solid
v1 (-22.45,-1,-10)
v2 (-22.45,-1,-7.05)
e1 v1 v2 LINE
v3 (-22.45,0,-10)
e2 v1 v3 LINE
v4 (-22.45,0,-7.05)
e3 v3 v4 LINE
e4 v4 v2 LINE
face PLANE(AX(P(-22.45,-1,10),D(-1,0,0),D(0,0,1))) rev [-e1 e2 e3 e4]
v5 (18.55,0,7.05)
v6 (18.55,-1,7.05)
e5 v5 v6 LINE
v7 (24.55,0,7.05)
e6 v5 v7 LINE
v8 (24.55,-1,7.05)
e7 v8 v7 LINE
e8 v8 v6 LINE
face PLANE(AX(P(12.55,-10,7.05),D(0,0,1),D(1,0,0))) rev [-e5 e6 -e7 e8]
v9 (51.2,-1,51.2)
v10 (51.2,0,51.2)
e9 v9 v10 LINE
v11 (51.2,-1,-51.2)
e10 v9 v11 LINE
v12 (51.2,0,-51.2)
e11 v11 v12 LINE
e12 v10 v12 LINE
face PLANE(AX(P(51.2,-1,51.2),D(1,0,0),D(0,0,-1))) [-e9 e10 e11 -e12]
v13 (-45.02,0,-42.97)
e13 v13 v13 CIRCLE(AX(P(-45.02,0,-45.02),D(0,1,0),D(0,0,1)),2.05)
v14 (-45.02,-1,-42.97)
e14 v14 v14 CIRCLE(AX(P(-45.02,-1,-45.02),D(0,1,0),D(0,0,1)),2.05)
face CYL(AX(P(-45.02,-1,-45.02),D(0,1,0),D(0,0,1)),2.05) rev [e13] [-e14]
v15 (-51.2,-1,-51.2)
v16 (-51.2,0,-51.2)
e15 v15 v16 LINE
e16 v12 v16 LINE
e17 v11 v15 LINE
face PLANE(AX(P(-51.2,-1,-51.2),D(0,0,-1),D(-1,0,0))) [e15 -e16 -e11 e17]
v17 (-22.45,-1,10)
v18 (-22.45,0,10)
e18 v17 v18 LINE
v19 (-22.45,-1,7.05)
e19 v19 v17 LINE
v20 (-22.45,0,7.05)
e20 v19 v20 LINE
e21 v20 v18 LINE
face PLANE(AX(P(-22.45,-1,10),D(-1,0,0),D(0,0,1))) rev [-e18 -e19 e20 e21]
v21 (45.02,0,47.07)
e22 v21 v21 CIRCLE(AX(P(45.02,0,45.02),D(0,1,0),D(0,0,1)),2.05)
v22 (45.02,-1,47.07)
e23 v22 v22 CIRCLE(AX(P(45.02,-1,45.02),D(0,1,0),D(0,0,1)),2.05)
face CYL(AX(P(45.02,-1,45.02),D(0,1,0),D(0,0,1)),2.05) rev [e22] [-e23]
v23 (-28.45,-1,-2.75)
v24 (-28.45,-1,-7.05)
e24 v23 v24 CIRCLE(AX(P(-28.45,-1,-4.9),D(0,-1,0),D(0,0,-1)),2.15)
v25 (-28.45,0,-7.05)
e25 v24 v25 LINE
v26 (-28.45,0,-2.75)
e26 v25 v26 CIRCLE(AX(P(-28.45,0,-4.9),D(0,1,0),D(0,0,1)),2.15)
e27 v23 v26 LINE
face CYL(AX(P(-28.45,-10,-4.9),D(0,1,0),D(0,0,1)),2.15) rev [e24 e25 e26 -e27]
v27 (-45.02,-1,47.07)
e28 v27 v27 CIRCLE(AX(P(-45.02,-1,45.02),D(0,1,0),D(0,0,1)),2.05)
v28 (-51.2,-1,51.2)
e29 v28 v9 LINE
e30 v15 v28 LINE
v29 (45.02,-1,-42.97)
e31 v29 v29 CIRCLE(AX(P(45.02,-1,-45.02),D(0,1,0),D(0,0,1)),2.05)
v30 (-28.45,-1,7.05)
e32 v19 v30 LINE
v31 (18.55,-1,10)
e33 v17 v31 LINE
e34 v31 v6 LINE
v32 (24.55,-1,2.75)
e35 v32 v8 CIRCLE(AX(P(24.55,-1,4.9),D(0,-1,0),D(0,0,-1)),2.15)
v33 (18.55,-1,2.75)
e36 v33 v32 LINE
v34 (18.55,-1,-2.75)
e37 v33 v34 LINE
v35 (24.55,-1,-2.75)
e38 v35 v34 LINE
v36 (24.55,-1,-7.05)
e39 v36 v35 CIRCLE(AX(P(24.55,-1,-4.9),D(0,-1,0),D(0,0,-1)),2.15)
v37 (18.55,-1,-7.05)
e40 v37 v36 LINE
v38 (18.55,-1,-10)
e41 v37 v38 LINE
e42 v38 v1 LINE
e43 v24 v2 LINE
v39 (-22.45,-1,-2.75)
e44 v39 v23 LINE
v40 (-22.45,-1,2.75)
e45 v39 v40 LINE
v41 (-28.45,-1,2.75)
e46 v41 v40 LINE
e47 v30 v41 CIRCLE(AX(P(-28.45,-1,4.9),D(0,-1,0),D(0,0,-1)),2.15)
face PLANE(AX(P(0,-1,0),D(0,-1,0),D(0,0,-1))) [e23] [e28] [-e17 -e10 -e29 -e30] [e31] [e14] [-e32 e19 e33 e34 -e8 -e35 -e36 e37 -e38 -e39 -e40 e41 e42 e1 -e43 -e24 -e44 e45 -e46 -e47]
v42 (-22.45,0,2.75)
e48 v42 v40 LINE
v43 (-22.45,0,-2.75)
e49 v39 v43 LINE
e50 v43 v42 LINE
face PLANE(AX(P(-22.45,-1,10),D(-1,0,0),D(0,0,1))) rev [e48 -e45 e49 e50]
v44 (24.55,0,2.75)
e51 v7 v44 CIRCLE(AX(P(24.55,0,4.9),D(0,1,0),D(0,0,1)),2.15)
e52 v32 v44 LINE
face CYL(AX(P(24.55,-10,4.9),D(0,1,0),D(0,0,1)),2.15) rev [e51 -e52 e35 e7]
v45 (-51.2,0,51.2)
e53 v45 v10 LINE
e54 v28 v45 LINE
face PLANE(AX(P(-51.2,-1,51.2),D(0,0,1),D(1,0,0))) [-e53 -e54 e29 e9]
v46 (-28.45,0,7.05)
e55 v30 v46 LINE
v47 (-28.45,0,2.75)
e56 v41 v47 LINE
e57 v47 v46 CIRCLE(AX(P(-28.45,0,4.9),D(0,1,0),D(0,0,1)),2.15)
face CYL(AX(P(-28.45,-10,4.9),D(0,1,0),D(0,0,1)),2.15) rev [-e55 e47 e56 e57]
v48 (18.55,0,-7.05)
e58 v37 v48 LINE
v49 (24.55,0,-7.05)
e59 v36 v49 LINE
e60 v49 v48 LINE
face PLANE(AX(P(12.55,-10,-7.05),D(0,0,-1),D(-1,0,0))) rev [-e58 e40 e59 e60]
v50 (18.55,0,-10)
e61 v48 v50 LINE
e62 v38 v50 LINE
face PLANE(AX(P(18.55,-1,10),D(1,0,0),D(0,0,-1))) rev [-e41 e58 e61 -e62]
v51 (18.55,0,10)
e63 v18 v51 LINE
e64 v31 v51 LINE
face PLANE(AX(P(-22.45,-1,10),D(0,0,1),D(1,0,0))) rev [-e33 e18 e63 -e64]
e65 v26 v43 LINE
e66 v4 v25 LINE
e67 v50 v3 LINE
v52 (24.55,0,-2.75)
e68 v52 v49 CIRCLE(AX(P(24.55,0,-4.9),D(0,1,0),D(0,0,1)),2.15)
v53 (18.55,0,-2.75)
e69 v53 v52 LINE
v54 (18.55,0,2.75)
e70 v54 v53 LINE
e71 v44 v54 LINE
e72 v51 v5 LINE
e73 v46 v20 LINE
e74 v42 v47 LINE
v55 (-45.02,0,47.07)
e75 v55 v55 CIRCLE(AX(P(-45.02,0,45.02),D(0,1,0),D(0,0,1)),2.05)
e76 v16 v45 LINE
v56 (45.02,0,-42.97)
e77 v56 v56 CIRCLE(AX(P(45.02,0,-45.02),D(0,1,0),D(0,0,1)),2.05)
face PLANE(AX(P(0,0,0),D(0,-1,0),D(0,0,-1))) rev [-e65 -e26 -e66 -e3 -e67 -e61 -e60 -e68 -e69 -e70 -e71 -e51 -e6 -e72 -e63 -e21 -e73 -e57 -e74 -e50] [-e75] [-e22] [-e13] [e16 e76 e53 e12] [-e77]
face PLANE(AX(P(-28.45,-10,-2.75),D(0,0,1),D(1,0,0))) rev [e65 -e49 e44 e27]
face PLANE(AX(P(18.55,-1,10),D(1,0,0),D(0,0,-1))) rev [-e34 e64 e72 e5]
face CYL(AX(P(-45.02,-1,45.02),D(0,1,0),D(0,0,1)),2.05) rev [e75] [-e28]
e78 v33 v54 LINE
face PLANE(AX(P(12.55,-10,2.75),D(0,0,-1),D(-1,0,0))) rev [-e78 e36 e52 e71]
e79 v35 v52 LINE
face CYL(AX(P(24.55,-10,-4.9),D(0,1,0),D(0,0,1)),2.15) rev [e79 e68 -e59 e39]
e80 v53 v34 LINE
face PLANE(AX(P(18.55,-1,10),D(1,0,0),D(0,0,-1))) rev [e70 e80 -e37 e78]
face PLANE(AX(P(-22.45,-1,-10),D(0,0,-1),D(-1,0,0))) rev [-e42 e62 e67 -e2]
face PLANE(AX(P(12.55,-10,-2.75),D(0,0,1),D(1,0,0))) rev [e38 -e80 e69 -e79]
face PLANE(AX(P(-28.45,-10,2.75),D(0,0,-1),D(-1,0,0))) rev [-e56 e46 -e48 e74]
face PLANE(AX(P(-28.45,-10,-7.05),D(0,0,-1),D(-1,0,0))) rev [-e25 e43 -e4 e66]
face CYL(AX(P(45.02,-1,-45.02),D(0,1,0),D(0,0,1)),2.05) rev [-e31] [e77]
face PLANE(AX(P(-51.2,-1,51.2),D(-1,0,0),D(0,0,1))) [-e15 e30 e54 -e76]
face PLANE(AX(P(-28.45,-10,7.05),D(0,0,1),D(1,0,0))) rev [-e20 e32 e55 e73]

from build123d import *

# Parameters (mm, degrees)
SKETCH1_W          = 102.4
SKETCH1_H          = 102.4
SKETCH1_R          = 2.05
SKETCH1_W_2        = 41
SKETCH1_H_2        = 20
BASE_FLANGE1_DEPTH = 1
CUT_EXTRUDE2_DEPTH = 10


# Sheet-metal steps are written as plain solids
with BuildPart() as part:
    # Sketch1 → Base-Flange1 (new body)
    with BuildSketch(Plane(origin=(0, 0, 0), x_dir=(1, 0, 0), z_dir=(0, 1, 0))):
        Rectangle(SKETCH1_W, SKETCH1_H)
        with Locations(Location((45.02, 45.02, 0), (0, 0, 270))):
            Circle(SKETCH1_R, mode=Mode.SUBTRACT)
        with Locations(Location((45.02, -45.02, 0), (0, 0, 270))):
            Circle(SKETCH1_R, mode=Mode.SUBTRACT)
        with Locations(Location((-45.02, -45.02, 0), (0, 0, 270))):
            Circle(SKETCH1_R, mode=Mode.SUBTRACT)
        with Locations(Location((-45.02, 45.02, 0), (0, 0, 270))):
            Circle(SKETCH1_R, mode=Mode.SUBTRACT)
        with Locations((-1.95, 0)):
            Rectangle(SKETCH1_W_2, SKETCH1_H_2, mode=Mode.SUBTRACT)
    extrude(amount=-BASE_FLANGE1_DEPTH)

    # Sketch7 → Cut-Extrude2 (cut)
    with BuildSketch(Plane(origin=(0, 0, 0), x_dir=(1, 0, 0), z_dir=(0, 1, 0))):
        with BuildLine():
            Line((-28.45, 7.05), (-16.45, 7.05))
            ThreePointArc((-16.45, 7.05), (-14.3, 4.9), (-16.45, 2.75))
            Line((-16.45, 2.75), (-28.45, 2.75))
            ThreePointArc((-28.45, 2.75), (-30.6, 4.9), (-28.45, 7.05))
        make_face()
        with BuildLine():
            Line((-28.45, -2.75), (-16.45, -2.75))
            ThreePointArc((-16.45, -2.75), (-14.3, -4.9), (-16.45, -7.05))
            Line((-16.45, -7.05), (-28.45, -7.05))
            ThreePointArc((-28.45, -7.05), (-30.6, -4.9), (-28.45, -2.75))
        make_face()
        with BuildLine():
            Line((12.55, 7.05), (24.55, 7.05))
            ThreePointArc((24.55, 7.05), (26.7, 4.9), (24.55, 2.75))
            Line((24.55, 2.75), (12.55, 2.75))
            ThreePointArc((12.55, 2.75), (10.4, 4.9), (12.55, 7.05))
        make_face()
        with BuildLine():
            Line((12.55, -2.75), (24.55, -2.75))
            ThreePointArc((24.55, -2.75), (26.7, -4.9), (24.55, -7.05))
            Line((24.55, -7.05), (12.55, -7.05))
            ThreePointArc((12.55, -7.05), (10.4, -4.9), (12.55, -2.75))
        make_face()
    extrude(amount=-CUT_EXTRUDE2_DEPTH, mode=Mode.SUBTRACT)


solid = part.part
